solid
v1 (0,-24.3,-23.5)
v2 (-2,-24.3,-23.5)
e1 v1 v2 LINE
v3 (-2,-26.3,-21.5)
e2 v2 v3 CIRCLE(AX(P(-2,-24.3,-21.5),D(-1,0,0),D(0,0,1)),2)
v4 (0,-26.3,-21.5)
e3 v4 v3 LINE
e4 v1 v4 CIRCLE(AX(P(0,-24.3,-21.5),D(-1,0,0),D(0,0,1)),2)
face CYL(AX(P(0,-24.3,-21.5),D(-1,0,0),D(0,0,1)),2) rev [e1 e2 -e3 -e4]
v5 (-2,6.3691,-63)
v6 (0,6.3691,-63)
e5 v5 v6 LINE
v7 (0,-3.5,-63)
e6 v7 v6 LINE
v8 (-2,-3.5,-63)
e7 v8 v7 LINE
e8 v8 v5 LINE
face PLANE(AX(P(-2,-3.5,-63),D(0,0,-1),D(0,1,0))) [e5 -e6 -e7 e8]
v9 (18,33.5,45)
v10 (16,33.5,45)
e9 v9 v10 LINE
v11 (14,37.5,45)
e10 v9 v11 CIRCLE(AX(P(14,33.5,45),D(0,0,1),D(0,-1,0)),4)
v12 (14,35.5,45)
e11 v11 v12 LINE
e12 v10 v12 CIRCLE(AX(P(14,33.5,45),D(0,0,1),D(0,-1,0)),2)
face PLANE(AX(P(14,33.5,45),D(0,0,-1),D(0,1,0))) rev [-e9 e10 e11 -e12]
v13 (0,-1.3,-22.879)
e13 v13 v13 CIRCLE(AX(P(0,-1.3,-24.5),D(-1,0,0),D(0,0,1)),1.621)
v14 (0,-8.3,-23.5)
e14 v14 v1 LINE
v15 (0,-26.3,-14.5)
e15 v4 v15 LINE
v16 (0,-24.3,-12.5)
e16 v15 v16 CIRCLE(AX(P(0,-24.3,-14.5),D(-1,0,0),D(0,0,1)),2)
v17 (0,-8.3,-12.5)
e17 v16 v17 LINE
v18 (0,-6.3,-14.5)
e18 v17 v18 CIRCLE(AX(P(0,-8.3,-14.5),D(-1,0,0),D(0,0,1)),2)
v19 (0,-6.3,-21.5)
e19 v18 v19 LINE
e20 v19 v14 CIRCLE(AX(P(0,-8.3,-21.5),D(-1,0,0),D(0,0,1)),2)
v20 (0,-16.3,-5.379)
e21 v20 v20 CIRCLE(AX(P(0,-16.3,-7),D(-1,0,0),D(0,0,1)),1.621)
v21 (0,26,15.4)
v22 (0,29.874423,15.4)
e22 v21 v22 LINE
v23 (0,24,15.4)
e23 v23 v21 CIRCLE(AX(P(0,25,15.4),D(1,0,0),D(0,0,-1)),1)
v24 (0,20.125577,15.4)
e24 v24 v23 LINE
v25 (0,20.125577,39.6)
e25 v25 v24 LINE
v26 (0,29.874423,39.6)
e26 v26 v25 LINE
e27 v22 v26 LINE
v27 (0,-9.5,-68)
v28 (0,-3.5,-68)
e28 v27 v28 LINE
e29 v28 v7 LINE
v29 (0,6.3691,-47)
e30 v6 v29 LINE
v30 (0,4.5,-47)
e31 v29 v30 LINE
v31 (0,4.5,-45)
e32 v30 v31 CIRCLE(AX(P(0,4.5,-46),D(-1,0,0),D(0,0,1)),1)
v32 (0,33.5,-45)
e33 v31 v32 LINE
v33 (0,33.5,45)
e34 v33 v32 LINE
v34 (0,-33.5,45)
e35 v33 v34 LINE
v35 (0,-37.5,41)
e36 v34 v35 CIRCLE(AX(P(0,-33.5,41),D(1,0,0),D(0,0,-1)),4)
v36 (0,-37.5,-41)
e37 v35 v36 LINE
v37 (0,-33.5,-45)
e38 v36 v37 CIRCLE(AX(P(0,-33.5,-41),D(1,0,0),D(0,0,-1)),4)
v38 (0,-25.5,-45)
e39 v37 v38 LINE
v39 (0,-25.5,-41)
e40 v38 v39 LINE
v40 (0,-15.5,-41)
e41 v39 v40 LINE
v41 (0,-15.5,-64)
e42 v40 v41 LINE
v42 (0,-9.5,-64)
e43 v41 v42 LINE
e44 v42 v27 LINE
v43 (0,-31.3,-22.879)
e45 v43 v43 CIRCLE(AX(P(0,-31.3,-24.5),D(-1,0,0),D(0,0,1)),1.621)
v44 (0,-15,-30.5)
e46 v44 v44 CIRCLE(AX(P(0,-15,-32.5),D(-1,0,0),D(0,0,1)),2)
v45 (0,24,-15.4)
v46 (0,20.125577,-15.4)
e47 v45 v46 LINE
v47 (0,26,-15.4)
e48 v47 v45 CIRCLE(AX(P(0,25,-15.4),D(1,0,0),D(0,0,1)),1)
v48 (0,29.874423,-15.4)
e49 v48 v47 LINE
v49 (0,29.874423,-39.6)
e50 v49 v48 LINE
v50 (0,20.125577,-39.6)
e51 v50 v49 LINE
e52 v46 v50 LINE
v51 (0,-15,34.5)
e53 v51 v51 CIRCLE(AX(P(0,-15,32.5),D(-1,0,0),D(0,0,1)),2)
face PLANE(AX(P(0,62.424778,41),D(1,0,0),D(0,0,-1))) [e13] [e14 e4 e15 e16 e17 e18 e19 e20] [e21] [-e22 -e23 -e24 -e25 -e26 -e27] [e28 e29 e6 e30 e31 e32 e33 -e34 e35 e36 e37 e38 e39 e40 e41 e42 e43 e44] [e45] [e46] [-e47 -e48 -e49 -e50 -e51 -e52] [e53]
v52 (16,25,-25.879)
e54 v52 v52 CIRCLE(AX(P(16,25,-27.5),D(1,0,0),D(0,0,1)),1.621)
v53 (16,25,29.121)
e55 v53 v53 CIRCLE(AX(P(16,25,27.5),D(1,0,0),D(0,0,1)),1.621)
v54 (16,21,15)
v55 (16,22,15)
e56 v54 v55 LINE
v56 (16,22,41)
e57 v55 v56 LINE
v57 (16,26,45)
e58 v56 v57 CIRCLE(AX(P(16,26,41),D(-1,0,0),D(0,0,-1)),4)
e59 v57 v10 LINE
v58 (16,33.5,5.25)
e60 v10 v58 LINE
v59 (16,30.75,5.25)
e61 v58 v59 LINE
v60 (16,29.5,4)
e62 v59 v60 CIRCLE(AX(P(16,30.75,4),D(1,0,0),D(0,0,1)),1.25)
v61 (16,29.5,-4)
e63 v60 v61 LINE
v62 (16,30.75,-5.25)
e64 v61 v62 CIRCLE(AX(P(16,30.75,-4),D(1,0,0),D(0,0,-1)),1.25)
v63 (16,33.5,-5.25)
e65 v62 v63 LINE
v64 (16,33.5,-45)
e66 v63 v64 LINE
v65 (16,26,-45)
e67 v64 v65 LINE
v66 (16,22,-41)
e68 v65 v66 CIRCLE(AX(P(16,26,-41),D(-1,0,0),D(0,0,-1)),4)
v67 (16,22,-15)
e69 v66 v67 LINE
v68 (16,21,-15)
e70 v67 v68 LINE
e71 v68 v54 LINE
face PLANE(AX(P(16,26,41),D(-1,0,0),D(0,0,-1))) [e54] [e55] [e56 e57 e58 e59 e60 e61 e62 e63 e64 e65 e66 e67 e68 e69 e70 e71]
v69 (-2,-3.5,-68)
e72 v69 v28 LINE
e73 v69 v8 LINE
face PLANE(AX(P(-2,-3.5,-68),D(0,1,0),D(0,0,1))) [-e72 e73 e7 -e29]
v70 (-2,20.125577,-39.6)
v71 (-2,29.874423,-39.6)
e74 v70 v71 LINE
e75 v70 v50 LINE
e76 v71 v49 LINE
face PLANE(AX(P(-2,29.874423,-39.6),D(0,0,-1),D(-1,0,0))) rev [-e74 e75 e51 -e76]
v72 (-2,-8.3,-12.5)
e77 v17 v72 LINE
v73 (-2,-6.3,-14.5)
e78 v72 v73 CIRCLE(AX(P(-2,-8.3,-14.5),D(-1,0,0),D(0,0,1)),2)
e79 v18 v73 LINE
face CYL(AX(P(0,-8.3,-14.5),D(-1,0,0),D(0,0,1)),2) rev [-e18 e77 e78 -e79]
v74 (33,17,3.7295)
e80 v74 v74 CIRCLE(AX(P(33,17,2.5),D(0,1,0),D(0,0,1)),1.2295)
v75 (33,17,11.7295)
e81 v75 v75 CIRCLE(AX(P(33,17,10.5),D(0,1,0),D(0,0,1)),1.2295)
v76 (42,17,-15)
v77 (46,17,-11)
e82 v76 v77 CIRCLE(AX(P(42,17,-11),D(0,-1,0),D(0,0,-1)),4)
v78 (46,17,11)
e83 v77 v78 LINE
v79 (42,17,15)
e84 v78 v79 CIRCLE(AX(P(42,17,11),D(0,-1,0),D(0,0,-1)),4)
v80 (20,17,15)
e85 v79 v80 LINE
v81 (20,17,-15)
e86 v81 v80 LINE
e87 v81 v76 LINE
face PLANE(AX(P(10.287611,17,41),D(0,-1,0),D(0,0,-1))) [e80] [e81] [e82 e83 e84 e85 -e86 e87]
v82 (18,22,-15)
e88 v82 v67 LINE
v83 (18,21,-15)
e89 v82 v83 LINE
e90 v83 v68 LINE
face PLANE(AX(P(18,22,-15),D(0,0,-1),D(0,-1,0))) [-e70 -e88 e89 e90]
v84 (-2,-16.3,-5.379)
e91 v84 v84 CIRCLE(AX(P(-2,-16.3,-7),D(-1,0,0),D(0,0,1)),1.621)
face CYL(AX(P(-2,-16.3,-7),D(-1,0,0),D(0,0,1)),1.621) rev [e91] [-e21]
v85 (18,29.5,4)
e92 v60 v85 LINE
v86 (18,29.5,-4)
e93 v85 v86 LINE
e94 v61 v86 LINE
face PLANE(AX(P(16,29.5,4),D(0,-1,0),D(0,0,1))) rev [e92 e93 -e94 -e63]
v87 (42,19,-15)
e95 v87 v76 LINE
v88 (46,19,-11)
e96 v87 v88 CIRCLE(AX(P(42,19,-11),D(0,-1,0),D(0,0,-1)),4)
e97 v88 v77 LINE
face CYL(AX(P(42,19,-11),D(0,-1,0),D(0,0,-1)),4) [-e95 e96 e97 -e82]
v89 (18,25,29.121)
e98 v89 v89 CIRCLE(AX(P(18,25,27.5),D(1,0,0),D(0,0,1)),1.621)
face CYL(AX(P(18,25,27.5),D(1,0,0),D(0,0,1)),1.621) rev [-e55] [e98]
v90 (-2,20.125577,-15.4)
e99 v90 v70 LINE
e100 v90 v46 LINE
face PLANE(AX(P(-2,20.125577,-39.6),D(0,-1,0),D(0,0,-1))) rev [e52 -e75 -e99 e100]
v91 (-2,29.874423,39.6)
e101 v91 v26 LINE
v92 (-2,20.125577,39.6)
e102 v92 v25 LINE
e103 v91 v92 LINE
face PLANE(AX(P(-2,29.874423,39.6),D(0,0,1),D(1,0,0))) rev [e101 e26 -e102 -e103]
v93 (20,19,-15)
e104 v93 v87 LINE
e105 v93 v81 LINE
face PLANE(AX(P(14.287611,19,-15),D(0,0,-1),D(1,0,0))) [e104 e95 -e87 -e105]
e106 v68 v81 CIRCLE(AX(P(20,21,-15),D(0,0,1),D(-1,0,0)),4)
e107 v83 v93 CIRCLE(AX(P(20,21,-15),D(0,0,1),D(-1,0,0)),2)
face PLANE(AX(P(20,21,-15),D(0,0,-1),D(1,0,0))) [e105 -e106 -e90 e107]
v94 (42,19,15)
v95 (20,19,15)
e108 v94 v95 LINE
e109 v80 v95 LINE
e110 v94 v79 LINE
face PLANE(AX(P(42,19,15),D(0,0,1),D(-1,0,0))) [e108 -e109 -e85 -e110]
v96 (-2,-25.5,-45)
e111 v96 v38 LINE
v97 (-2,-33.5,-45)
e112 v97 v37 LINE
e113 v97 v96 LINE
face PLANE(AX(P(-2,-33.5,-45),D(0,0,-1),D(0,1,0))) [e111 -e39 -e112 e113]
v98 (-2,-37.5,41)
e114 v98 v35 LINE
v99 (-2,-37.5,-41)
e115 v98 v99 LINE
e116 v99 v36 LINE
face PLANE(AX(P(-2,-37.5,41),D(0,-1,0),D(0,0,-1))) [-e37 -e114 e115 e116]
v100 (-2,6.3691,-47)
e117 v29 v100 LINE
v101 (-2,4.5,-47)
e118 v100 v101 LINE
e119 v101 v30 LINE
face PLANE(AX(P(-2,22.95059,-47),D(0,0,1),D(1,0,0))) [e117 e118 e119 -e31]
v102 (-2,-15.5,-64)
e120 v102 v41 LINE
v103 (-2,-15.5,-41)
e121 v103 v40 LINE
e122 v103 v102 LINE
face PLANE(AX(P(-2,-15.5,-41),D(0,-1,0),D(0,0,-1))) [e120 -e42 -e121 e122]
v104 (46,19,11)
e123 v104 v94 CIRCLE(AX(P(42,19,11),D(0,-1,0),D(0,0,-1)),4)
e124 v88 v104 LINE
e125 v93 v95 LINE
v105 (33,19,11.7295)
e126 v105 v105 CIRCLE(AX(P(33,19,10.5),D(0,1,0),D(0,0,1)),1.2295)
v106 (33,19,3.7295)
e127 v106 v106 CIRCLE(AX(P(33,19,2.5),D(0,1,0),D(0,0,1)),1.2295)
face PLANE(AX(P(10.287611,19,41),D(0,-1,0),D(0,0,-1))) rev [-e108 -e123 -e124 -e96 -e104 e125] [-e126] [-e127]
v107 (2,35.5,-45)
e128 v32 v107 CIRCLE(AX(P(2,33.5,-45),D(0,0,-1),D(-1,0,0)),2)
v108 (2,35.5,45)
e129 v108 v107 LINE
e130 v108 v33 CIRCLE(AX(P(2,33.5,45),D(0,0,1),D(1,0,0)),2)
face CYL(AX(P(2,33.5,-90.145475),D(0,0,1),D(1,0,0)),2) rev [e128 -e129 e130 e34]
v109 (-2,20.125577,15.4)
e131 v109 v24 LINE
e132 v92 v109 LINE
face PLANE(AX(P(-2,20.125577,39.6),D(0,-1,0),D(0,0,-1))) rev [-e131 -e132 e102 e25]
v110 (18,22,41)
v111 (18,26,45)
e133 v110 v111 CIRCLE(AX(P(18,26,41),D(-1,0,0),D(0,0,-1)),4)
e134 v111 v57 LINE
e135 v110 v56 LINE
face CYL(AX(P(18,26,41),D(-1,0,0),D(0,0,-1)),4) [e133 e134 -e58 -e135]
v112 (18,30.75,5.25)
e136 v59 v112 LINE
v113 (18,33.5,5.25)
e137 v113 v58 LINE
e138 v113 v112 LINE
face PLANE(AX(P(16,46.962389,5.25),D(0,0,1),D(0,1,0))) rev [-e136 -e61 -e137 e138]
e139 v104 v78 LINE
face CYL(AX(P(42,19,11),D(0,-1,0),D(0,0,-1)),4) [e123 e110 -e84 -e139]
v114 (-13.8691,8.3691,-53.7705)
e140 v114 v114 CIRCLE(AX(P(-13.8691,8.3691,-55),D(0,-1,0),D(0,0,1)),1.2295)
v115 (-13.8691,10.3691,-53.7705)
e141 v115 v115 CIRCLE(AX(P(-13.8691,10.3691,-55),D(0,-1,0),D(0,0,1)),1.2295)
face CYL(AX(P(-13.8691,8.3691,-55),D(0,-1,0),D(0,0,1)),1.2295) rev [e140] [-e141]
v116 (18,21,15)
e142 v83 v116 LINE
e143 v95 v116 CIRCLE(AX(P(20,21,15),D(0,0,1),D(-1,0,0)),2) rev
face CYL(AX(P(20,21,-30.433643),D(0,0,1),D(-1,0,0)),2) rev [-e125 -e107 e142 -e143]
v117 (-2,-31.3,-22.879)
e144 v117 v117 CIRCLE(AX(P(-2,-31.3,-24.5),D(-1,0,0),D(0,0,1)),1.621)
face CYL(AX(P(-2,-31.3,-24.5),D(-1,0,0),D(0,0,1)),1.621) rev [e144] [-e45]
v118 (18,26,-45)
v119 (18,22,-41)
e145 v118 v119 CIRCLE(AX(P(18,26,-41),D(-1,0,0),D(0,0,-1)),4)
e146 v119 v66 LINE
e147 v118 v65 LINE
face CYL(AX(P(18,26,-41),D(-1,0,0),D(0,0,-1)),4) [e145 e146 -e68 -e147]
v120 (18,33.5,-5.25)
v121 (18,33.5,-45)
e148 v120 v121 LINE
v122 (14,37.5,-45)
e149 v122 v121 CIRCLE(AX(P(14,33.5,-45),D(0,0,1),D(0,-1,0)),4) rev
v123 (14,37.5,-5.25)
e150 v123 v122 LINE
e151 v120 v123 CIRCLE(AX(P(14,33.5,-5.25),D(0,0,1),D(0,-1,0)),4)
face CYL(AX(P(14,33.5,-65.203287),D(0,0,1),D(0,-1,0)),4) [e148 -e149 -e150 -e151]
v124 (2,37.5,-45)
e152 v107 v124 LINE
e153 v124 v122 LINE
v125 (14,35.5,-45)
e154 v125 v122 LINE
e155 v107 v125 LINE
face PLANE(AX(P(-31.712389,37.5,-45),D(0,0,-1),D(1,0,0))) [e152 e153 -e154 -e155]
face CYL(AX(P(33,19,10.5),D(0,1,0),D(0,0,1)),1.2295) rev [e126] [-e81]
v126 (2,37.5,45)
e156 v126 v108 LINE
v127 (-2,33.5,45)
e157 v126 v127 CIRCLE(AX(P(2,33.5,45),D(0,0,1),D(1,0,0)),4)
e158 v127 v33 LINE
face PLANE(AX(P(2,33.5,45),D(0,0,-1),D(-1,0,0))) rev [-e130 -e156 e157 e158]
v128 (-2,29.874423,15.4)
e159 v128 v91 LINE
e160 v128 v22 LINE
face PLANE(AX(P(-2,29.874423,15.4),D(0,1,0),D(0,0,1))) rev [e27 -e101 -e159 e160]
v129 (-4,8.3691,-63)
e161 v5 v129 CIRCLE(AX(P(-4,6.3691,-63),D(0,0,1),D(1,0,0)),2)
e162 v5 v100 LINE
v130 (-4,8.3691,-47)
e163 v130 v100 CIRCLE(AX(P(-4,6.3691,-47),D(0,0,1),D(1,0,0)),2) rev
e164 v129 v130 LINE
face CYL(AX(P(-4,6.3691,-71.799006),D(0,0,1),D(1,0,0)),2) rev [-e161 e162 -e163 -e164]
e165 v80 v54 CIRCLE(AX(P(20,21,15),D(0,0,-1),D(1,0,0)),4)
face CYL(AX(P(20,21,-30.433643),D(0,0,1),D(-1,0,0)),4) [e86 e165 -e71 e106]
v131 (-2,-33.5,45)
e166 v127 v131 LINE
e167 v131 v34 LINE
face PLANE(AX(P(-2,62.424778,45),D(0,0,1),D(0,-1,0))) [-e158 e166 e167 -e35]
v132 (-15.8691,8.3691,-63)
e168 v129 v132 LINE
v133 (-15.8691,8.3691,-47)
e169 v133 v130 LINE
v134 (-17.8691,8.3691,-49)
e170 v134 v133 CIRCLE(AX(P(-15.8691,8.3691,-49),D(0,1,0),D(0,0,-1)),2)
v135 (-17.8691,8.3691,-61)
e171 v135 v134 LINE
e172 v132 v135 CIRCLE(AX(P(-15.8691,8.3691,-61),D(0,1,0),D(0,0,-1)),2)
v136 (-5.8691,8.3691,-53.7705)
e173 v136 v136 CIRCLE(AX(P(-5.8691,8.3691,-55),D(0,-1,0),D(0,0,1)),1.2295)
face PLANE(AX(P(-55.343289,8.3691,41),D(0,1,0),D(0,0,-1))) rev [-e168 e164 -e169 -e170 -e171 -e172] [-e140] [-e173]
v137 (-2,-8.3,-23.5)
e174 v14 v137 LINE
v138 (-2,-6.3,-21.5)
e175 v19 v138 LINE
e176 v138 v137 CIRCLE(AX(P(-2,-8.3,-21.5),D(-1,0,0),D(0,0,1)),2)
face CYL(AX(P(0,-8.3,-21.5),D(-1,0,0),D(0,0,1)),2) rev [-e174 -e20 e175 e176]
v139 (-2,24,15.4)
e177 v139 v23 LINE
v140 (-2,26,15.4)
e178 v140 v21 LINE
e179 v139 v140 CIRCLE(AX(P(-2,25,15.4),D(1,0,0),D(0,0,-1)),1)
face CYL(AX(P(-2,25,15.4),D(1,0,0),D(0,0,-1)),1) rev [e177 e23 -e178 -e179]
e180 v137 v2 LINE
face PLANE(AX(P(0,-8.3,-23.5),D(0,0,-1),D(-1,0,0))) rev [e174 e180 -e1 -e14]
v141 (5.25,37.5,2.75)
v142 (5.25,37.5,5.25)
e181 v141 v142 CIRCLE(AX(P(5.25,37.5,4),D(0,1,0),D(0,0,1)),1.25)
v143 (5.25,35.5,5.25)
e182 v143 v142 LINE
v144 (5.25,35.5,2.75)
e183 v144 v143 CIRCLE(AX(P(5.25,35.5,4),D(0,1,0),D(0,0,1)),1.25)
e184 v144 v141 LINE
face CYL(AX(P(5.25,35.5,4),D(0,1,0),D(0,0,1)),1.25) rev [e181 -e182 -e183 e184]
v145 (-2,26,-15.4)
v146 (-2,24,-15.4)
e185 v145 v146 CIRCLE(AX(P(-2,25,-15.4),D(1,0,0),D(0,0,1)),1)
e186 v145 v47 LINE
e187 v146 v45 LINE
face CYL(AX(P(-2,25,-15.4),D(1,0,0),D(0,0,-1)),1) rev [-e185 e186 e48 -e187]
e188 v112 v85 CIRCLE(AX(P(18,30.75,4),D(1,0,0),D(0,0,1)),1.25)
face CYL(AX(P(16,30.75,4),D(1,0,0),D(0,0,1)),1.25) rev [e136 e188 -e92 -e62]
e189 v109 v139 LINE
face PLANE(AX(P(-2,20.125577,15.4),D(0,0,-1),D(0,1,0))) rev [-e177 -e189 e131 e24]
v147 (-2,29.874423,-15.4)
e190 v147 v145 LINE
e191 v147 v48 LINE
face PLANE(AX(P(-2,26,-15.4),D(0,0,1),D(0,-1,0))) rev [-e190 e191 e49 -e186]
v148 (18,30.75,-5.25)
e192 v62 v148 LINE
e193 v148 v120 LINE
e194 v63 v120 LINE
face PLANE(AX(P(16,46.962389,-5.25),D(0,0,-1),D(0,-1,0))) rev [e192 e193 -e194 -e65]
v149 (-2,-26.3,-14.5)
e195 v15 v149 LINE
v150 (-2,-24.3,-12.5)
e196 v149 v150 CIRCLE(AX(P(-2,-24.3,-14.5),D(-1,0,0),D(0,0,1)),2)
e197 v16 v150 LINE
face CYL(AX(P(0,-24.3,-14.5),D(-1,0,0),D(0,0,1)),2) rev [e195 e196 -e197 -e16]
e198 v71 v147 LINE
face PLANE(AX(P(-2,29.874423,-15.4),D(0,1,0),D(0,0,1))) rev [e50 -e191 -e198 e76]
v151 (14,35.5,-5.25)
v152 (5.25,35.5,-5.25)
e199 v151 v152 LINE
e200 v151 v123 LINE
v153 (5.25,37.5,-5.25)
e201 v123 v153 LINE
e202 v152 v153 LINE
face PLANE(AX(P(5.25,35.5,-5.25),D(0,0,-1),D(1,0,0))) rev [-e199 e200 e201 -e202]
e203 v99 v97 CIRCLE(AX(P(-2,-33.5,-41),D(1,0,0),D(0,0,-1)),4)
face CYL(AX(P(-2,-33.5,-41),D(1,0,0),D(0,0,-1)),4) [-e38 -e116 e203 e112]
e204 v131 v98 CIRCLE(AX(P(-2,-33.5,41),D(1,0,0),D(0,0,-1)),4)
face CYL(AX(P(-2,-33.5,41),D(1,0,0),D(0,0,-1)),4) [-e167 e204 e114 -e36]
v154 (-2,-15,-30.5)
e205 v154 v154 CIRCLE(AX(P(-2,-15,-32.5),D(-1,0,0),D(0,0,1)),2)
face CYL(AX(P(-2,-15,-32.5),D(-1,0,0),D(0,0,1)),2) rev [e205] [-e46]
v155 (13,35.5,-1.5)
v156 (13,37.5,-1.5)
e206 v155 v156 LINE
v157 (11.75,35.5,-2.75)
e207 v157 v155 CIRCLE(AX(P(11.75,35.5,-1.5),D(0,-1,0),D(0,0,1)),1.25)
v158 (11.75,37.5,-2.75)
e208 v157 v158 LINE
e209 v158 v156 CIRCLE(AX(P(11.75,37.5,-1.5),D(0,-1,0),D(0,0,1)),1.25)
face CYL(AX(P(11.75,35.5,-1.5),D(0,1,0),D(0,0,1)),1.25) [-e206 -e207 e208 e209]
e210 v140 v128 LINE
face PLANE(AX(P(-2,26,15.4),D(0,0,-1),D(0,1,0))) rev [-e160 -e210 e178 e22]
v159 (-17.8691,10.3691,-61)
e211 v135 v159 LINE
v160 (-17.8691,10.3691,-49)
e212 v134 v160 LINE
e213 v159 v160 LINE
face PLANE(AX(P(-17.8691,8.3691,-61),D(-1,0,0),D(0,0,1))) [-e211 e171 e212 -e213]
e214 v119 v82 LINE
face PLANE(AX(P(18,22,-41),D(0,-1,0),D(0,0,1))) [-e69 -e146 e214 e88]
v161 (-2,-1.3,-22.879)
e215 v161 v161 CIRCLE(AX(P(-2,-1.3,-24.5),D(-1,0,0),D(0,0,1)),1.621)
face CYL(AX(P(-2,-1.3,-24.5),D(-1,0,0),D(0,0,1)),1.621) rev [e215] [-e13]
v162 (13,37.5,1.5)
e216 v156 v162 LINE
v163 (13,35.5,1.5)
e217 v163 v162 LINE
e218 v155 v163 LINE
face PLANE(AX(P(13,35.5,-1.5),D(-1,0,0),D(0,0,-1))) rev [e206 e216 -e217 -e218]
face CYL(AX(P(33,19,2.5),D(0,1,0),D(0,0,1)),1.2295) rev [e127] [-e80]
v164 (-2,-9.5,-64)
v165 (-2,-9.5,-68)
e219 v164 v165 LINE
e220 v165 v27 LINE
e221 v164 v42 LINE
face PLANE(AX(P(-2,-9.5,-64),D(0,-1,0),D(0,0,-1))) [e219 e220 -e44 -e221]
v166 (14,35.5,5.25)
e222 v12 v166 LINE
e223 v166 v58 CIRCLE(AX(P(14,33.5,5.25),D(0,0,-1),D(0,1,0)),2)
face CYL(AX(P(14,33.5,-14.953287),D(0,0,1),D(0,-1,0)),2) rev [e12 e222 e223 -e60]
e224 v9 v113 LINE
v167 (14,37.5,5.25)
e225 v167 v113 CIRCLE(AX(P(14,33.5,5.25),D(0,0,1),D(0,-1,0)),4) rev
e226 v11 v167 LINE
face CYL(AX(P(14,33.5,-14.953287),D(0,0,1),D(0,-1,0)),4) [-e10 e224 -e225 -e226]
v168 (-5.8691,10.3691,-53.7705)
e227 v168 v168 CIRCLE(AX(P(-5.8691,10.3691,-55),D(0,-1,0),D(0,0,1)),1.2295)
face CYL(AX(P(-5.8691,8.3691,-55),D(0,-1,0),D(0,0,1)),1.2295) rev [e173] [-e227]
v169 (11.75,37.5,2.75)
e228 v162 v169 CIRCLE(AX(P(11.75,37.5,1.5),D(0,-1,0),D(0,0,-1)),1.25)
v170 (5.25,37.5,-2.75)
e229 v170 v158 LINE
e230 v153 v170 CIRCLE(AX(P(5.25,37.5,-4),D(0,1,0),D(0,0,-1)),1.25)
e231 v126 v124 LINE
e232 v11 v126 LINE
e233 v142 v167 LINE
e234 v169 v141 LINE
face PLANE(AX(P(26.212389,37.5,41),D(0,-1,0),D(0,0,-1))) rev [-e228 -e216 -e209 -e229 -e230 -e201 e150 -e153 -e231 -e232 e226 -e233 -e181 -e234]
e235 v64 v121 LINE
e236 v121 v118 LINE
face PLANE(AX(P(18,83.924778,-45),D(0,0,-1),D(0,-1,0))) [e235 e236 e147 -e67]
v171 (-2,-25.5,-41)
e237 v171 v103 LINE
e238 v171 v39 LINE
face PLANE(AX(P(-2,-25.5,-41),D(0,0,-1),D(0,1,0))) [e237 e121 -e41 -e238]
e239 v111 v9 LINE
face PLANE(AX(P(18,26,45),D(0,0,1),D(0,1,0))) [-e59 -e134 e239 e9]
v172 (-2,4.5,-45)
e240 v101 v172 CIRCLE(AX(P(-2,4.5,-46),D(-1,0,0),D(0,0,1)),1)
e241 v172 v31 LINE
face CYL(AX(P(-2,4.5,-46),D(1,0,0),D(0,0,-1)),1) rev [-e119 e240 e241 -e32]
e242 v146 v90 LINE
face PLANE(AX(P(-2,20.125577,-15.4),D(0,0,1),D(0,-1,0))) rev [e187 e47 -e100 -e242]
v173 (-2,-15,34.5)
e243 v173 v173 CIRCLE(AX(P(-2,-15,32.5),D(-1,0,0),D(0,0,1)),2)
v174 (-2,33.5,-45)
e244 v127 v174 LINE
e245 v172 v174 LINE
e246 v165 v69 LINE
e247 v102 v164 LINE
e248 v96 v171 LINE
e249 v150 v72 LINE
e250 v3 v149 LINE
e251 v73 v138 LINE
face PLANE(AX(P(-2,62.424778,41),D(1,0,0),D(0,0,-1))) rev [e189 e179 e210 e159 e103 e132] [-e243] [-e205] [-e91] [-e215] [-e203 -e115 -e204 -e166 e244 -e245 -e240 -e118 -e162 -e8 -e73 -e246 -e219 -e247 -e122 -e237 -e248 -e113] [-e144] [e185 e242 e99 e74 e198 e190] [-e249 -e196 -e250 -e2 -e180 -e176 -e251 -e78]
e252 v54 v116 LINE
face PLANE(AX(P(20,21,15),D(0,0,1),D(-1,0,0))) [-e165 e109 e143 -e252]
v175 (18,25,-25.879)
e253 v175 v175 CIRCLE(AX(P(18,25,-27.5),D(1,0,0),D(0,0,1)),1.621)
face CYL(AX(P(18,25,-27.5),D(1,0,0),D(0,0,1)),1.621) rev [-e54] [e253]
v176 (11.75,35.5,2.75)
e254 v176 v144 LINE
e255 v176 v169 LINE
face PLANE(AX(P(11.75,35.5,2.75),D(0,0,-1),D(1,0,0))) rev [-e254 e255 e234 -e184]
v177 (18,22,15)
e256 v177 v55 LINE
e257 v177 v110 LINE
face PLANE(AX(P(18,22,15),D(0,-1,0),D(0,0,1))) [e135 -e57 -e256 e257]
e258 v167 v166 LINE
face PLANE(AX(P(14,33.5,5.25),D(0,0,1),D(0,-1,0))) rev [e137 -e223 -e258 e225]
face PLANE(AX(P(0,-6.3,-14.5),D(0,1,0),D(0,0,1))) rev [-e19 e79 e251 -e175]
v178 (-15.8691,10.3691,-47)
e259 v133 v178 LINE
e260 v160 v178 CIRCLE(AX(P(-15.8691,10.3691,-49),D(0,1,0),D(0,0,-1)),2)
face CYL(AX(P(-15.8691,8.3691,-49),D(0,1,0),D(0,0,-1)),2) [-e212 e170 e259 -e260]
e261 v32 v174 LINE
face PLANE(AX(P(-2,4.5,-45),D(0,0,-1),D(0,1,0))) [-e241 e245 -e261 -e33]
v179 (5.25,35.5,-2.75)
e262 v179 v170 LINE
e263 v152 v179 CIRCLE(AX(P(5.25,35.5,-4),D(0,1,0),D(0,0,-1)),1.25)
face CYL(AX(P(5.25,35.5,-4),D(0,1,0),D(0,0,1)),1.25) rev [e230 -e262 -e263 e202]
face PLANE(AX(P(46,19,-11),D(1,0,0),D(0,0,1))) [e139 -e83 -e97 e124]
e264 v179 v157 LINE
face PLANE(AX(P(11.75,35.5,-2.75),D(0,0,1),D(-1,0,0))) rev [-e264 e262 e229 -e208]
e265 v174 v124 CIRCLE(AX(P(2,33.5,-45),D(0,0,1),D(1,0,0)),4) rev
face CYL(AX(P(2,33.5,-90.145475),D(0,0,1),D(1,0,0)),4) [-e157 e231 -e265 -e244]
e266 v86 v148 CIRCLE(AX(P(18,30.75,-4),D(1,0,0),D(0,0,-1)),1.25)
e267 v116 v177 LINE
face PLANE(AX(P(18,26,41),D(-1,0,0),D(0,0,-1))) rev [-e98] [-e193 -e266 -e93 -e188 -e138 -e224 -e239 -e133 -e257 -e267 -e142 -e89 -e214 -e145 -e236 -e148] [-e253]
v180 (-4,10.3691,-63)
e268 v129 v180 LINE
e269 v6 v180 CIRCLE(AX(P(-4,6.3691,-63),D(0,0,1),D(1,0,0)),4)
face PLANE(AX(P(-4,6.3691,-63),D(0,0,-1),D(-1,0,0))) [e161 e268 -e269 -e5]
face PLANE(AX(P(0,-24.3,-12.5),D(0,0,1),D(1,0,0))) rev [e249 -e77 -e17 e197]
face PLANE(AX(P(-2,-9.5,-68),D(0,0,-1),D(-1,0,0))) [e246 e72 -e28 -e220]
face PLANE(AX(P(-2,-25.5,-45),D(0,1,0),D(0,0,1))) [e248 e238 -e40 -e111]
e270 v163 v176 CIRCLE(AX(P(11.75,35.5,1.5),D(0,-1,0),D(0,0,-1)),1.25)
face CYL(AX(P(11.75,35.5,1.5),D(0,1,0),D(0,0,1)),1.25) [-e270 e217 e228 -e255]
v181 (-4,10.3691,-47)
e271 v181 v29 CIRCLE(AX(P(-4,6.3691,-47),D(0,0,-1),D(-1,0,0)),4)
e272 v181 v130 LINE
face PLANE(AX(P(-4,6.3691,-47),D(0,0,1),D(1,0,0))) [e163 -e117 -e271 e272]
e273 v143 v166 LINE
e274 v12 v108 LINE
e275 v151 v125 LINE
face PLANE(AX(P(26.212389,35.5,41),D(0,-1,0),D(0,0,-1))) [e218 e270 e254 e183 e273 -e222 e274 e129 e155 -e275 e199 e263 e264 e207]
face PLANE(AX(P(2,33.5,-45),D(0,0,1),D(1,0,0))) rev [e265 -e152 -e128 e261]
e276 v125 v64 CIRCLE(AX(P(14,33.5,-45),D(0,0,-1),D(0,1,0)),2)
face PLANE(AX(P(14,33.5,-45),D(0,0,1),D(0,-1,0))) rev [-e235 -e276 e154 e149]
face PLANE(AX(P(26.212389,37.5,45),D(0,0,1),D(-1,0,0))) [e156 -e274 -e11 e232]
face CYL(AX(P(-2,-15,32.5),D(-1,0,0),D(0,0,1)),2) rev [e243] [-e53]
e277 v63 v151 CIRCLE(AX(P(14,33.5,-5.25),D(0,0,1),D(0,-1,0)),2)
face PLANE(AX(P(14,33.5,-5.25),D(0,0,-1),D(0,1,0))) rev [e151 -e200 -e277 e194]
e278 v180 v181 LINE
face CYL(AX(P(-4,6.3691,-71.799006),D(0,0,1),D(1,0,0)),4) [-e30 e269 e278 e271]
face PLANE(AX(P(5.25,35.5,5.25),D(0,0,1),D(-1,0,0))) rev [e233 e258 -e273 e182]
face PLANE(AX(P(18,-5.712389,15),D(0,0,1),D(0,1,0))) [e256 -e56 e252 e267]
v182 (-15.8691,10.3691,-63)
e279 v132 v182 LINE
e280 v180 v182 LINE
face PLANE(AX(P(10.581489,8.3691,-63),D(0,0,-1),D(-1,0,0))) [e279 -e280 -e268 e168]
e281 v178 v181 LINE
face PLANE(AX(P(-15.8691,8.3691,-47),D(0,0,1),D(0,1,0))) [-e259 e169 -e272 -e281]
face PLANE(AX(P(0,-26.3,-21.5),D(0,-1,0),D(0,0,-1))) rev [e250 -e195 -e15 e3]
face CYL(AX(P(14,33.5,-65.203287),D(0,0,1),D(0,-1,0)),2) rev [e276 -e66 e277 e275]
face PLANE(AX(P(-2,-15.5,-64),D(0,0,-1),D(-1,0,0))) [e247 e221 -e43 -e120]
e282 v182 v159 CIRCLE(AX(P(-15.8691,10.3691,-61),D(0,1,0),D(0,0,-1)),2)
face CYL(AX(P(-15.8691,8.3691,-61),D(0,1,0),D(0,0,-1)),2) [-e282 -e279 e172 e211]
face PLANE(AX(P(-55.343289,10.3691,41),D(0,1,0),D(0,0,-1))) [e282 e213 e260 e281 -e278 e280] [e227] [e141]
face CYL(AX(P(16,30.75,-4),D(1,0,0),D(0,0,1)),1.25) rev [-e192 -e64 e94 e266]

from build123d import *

# Parameters (mm, degrees)
BOSS_EXTRUDE1_DEPTH        = 2
F_4_0_4_DIAMETER_HOLE1_D   = 4
M3_CLEARANCE_HOLE1_D       = 3.242
M2_CLEARANCE_HOLE1_D       = 2.459
CUT_EXTRUDE1_DEPTH         = 120.410650844
CUT_EXTRUDE2_DEPTH         = 120.410650844
CUT_EXTRUDE3_DEPTH         = 120.410650844
SKETCHED_START             = 71.002297961
SKETCHED_BEND5_OUTLINE_W   = 2
SKETCHED_BEND5_OUTLINE_H   = 30
SKETCHED_BEND5_DEPTH       = 27.13486898
SKETCHED_START_2           = 69.424777961
SKETCHED_BEND5_2_OUTLINE_R = 1.2295
SKETCHED_BEND5_2_DEPTH     = 1.57752
SKETCHED_START_3           = 70.821415498
SKETCHED_BEND5_3_OUTLINE_W = 2
SKETCHED_BEND5_3_OUTLINE_H = 30
SKETCHED_BEND5_3_DEPTH     = 0.180882463
SKETCHED_START_4           = 67.424777961
SKETCHED_BEND5_4_OUTLINE_R = 1.2295
SKETCHED_BEND5_4_DEPTH     = 3.044520614
SKETCHED_BEND5_5_OUTLINE_R = 1.2295
SKETCHED_BEND5_5_DEPTH     = 0.42248
SKETCHED_START_5           = -15
SKETCHED_BEND5_6_DEPTH     = 30
SKETCHED_BEND5_7_DEPTH     = 30
SKETCHED_START_6           = 53.789908981
SKETCHED_BEND6_OUTLINE_R   = 1.2295
SKETCHED_BEND6_DEPTH       = 17.63486898
SKETCHED_START_7           = 50.212388981
SKETCHED_BEND6_2_OUTLINE_R = 1.621
SKETCHED_BEND6_2_DEPTH     = 5.796728131
SKETCHED_START_8           = 52.569466273
SKETCHED_BEND6_3_OUTLINE_W = 2
SKETCHED_BEND6_3_OUTLINE_H = 30
SKETCHED_BEND6_3_DEPTH     = 29.642922707
SKETCHED_BEND6_4_DEPTH     = 30
SKETCHED_START_9           = -45
SKETCHED_BEND6_5_DEPTH     = 90
SKETCHED_START_10          = 13
SKETCHED_BEND6_6_OUTLINE_W = 2
SKETCHED_BEND6_6_OUTLINE_H = 30
SKETCHED_BEND6_6_OUTLINE_R = 1.2295
SKETCHED_BEND6_6_DEPTH     = 5.5
SKETCHED_START_11          = 17.9863
SKETCHED_BEND6_7_OUTLINE_W = 1.642922708
SKETCHED_BEND6_7_OUTLINE_H = 30
SKETCHED_BEND6_7_DEPTH     = 0.5137
SKETCHED_BEND7_DEPTH       = 90
SKETCHED_BEND7_2_OUTLINE_W = 2
SKETCHED_BEND7_2_OUTLINE_H = 7.500000007
SKETCHED_BEND7_2_DEPTH     = 90
SKETCHED_BEND7_3_DEPTH     = 30
SKETCHED_BEND7_4_DEPTH     = 41
SKETCHED_START_12          = 4
SKETCHED_BEND7_5_DEPTH     = 41
SKETCHED_START_13          = 30.750000007
SKETCHED_BEND7_6_DEPTH     = 7.249999993
SKETCHED_START_14          = 4.5
SKETCHED_BEND7_7_OUTLINE_R = 1.2295
SKETCHED_BEND7_7_DEPTH     = 17.5
SKETCHED_START_15          = 16
SKETCHED_BEND7_8_OUTLINE_R = 1.621
SKETCHED_BEND7_8_DEPTH     = 3
SKETCHED_START_16          = 9.797769412
SKETCHED_BEND8_OUTLINE_W   = 2
SKETCHED_BEND8_OUTLINE_H   = 16.000000001
SKETCHED_BEND8_DEPTH       = 15.152820181
SKETCHED_START_17          = 8.369100306
SKETCHED_BEND8_2_OUTLINE_R = 1.2295
SKETCHED_BEND8_2_DEPTH     = 1.428669106
SKETCHED_START_18          = 6.746620306
SKETCHED_BEND8_3_OUTLINE_R = 1.2295
SKETCHED_BEND8_3_DEPTH     = 3.62248
SKETCHED_START_19          = -62.999999998
SKETCHED_BEND8_4_DEPTH     = 16
SKETCHED_BEND8_5_DEPTH     = 16


with BuildPart() as part:
    # Sketch17 → Boss-Extrude1 (new body)
    with BuildSketch(Plane(origin=(0, 0, 0), x_dir=(0, 0, -1), z_dir=(1, 0, 0))):
        with BuildLine():
            Line((-45, 62.424777961), (-45, -33.5))
            ThreePointArc((-45, -33.5), (-43.828427125, -36.328427125), (-41, -37.5))
            Line((-41, -37.5), (41, -37.5))
            ThreePointArc((41, -37.5), (43.828427125, -36.328427125), (45, -33.5))
            Line((45, -33.5), (45, -25.5))
            Line((45, -25.5), (41.000000004, -25.5))
            Line((41.000000004, -25.5), (41.000000004, -15.5))
            Line((41.000000004, -15.5), (63.999999999, -15.5))
            Line((63.999999999, -15.5), (63.999999999, -9.5))
            Line((63.999999999, -9.5), (67.999999998, -9.5))
            Line((67.999999998, -9.5), (67.999999998, -3.5))
            Line((67.999999998, -3.5), (62.999999998, -3.5))
            Line((62.999999998, -3.5), (62.999999998, 22.950589592))
            ThreePointArc((62.999999998, 22.950589592), (62.41421356, 24.364803155), (60.999999998, 24.950589593))
            Line((60.999999998, 24.950589593), (48.999999998, 24.950589593))
            ThreePointArc((48.999999998, 24.950589593), (47.585786435, 24.364803155), (46.999999998, 22.950589592))
            Line((46.999999998, 22.950589592), (46.999999998, 4.5))
            ThreePointArc((46.999999998, 4.5), (45.999999999, 3.500000002), (45, 4.5))
            Line((45, 4.5), (45, 62.424777961))
            ThreePointArc((45, 62.424777961), (43.828427125, 65.253205086), (41, 66.424777961))
            Line((41, 66.424777961), (15, 66.424777961))
            Line((15, 66.424777961), (15, 94.137166941))
            ThreePointArc((15, 94.137166941), (13.828427125, 96.965594066), (11, 98.137166941))
            Line((11, 98.137166941), (-11, 98.137166941))
            ThreePointArc((-11, 98.137166941), (-13.828427125, 96.965594066), (-15, 94.137166941))
            Line((-15, 94.137166941), (-15, 66.424777961))
            Line((-15, 66.424777961), (-41, 66.424777961))
            ThreePointArc((-41, 66.424777961), (-43.828427125, 65.253205086), (-45, 62.424777961))
        make_face()
    extrude(amount=-BOSS_EXTRUDE1_DEPTH)

    # Ø4.0 (4) Diameter Hole1 (through all)
    with Locations(Plane.ZY.offset(2)):
        with Locations((32.5, -15), (-32.5, -15)):
            Hole(F_4_0_4_DIAMETER_HOLE1_D / 2)

    # M3 Clearance Hole1 (through all)
    with Locations(Plane.ZY.offset(2)):
        with Locations((-7, -16.3), (-24.5, -31.3), (-24.5, -1.3), (-27.5, 63.424777961), (27.5, 63.424777961)):
            Hole(M3_CLEARANCE_HOLE1_D / 2)

    # M2 Clearance Hole1 (through all)
    with Locations(Plane.ZY.offset(2)):
        with Locations((-54.999999998, 20.950589593), (-54.999999998, 12.950589593), (2.5, 85.137166941), (10.5, 85.137166941)):
            Hole(M2_CLEARANCE_HOLE1_D / 2)

    # Sketch24 → Cut-Extrude1 (cut, through all)
    with BuildSketch(Plane.ZY.offset(2)):
        with BuildLine():
            Line((5.25, 41.462388992), (5.25, 57.674777954))
            ThreePointArc((5.25, 57.674777954), (4.883883476, 58.55866143), (4, 58.924777954))
            Line((4, 58.924777954), (-4, 58.924777954))
            ThreePointArc((-4, 58.924777954), (-4.883883476, 58.55866143), (-5.25, 57.674777954))
            Line((-5.25, 57.674777954), (-5.25, 41.462388992))
            ThreePointArc((-5.25, 41.462388992), (-4, 40.212388992), (-2.75, 41.462388992))
            Line((-2.75, 41.462388992), (-2.75, 47.962388992))
            ThreePointArc((-2.75, 47.962388992), (-2.383883476, 48.846272468), (-1.5, 49.212388992))
            Line((-1.5, 49.212388992), (1.5, 49.212388992))
            ThreePointArc((1.5, 49.212388992), (2.383883476, 48.846272468), (2.75, 47.962388992))
            Line((2.75, 47.962388992), (2.75, 41.462388992))
            ThreePointArc((2.75, 41.462388992), (4, 40.212388992), (5.25, 41.462388992))
        make_face()
    extrude(amount=-CUT_EXTRUDE1_DEPTH, mode=Mode.SUBTRACT)

    # Sketch25 → Cut-Extrude2 (cut, through all)
    with BuildSketch(Plane(origin=(0, 0, 0), x_dir=(0, 0, -1), z_dir=(1, 0, 0))):
        with BuildLine():
            Line((-15.4, 20.125576935), (-15.4, 23.999999992))
            ThreePointArc((-15.4, 23.999999992), (-14.4, 24.999999992), (-15.4, 25.999999992))
            Line((-15.4, 25.999999992), (-15.4, 29.87442305))
            Line((-15.4, 29.87442305), (-39.6, 29.87442305))
            Line((-39.6, 29.87442305), (-39.6, 20.125576935))
            Line((-39.6, 20.125576935), (-15.4, 20.125576935))
        make_face()
        with BuildLine():
            Line((39.6, 29.87442305), (39.6, 20.125576935))
            Line((39.6, 20.125576935), (15.4, 20.125576935))
            Line((15.4, 20.125576935), (15.4, 23.999999992))
            ThreePointArc((15.4, 23.999999992), (14.4, 24.999999992), (15.4, 25.999999992))
            Line((15.4, 25.999999992), (15.4, 29.87442305))
            Line((15.4, 29.87442305), (39.6, 29.87442305))
        make_face()
    extrude(amount=-CUT_EXTRUDE2_DEPTH, mode=Mode.SUBTRACT)

    # Sketch26 → Cut-Extrude3 (cut, through all)
    with BuildSketch(Plane.ZY.offset(2)):
        with BuildLine():
            Line((-21.500000002, -26.3), (-14.499999998, -26.3))
            ThreePointArc((-14.499999998, -26.3), (-13.085786437, -25.714213563), (-12.5, -24.300000002))
            Line((-12.5, -24.300000002), (-12.5, -8.299999998))
            ThreePointArc((-12.5, -8.299999998), (-13.085786437, -6.885786437), (-14.499999998, -6.3))
            Line((-14.499999998, -6.3), (-21.500000002, -6.3))
            ThreePointArc((-21.500000002, -6.3), (-22.914213563, -6.885786437), (-23.5, -8.299999998))
            Line((-23.5, -8.299999998), (-23.5, -24.300000002))
            ThreePointArc((-23.5, -24.300000002), (-22.914213563, -25.714213563), (-21.500000002, -26.3))
        make_face()
    extrude(amount=-CUT_EXTRUDE3_DEPTH, mode=Mode.SUBTRACT)

    # Sketched Bend5: read off the stored shape, not the designer's step
    # Sketched Bend5 outline → Sketched Bend5 (cut)
    with BuildSketch(Plane(origin=(0, 0, 0), x_dir=(1, 0, 0), z_dir=(0, 1, 0)).offset(SKETCHED_START)):
        with Locations((-1, 0)):
            Rectangle(SKETCHED_BEND5_OUTLINE_W, SKETCHED_BEND5_OUTLINE_H)
    extrude(amount=SKETCHED_BEND5_DEPTH, mode=Mode.SUBTRACT)

    # Sketched Bend5 2 outline → Sketched Bend5 2 (add)
    with BuildSketch(Plane(origin=(0, 0, 0), x_dir=(1, 0, 0), z_dir=(0, 1, 0)).offset(SKETCHED_START_2)):
        with BuildLine():
            ThreePointArc((-30, -11), (-28.828427125, -13.828427125), (-26, -15))
            Line((-26, -15), (-2, -15))
            Line((-2, -15), (-2, 15))
            Line((-2, 15), (-26, 15))
            ThreePointArc((-26, 15), (-28.828427125, 13.828427125), (-30, 11))
            Line((-30, 11), (-30, -11))
        make_face()
        with Locations((-17, -10.5)):
            Circle(SKETCHED_BEND5_2_OUTLINE_R, mode=Mode.SUBTRACT)
        with Locations((-17, -2.5)):
            Circle(SKETCHED_BEND5_2_OUTLINE_R, mode=Mode.SUBTRACT)
    extrude(amount=SKETCHED_BEND5_2_DEPTH)

    # Sketched Bend5 3 outline → Sketched Bend5 3 (cut)
    with BuildSketch(Plane(origin=(0, 0, 0), x_dir=(1, 0, 0), z_dir=(0, 1, 0)).offset(SKETCHED_START_3)):
        with Locations((-1, 0)):
            Rectangle(SKETCHED_BEND5_3_OUTLINE_W, SKETCHED_BEND5_3_OUTLINE_H)
    extrude(amount=SKETCHED_BEND5_3_DEPTH, mode=Mode.SUBTRACT)

    # Sketched Bend5 4 outline → Sketched Bend5 4 (add)
    with BuildSketch(Plane(origin=(0, 0, 0), x_dir=(1, 0, 0), z_dir=(0, 1, 0)).offset(SKETCHED_START_4)):
        with BuildLine():
            ThreePointArc((-30, -11), (-28.828427125, -13.828427125), (-26, -15))
            Line((-26, -15), (-2, -15))
            Line((-2, -15), (-2, 15))
            Line((-2, 15), (-26, 15))
            ThreePointArc((-26, 15), (-28.828427125, 13.828427125), (-30, 11))
            Line((-30, 11), (-30, -11))
        make_face()
        with Locations((-17, -10.5)):
            Circle(SKETCHED_BEND5_4_OUTLINE_R, mode=Mode.SUBTRACT)
        with Locations((-17, -2.5)):
            Circle(SKETCHED_BEND5_4_OUTLINE_R, mode=Mode.SUBTRACT)
    extrude(amount=SKETCHED_BEND5_4_DEPTH)

    # Sketched Bend5 5 outline → Sketched Bend5 5 (add)
    with BuildSketch(Plane(origin=(0, 0, 0), x_dir=(1, 0, 0), z_dir=(0, 1, 0)).offset(SKETCHED_START)):
        with BuildLine():
            ThreePointArc((-30, -11), (-28.828427125, -13.828427125), (-26, -15))
            Line((-26, -15), (-2, -15))
            Line((-2, -15), (-2, 15))
            Line((-2, 15), (-26, 15))
            ThreePointArc((-26, 15), (-28.828427125, 13.828427125), (-30, 11))
            Line((-30, 11), (-30, -11))
        make_face()
        with Locations((-17, -10.5)):
            Circle(SKETCHED_BEND5_5_OUTLINE_R, mode=Mode.SUBTRACT)
        with Locations((-17, -2.5)):
            Circle(SKETCHED_BEND5_5_OUTLINE_R, mode=Mode.SUBTRACT)
    extrude(amount=SKETCHED_BEND5_5_DEPTH)

    # Sketched Bend5 6 outline → Sketched Bend5 6 (cut)
    with BuildSketch(Plane.XY.offset(SKETCHED_START_5)):
        with BuildLine():
            ThreePointArc((-2, 67.424777961), (-2.585786438, 68.838991523), (-4, 69.424777961))
            Line((-4, 69.424777961), (-30, 69.424777961))
            Line((-30, 69.424777961), (-30, 67.424777961))
            Line((-30, 67.424777961), (-2, 67.424777961))
        make_face()
        with BuildLine():
            Line((0, 70.821415498), (-1.887453327, 70.821415498))
            ThreePointArc((-1.887453327, 70.821415498), (-0.503559904, 69.367689862), (0, 67.424777961))
            Line((0, 67.424777961), (0, 70.821415498))
        make_face()
        with BuildLine():
            Line((-2, 71.424777961), (-4, 71.424777961))
            ThreePointArc((-4, 71.424777961), (-2.96472382, 71.288481266), (-2, 70.888879577))
            Line((-2, 70.888879577), (-2, 71.424777961))
        make_face()
    extrude(amount=SKETCHED_BEND5_6_DEPTH, mode=Mode.SUBTRACT)

    # Sketched Bend5 7 outline → Sketched Bend5 7 (add)
    with BuildSketch(Plane.XY.offset(SKETCHED_START_5)):
        with BuildLine():
            ThreePointArc((-1.887453327, 70.821415498), (-1.943450004, 70.855609073), (-2, 70.888879577))
            Line((-2, 70.888879577), (-2, 70.821415498))
            Line((-2, 70.821415498), (-1.887453327, 70.821415498))
        make_face()
    extrude(amount=SKETCHED_BEND5_7_DEPTH)

    # Sketched Bend6: read off the stored shape, not the designer's step
    # Sketched Bend6 outline → Sketched Bend6 (cut)
    with BuildSketch(Plane(origin=(0, 0, 0), x_dir=(1, 0, 0), z_dir=(0, 1, 0)).offset(SKETCHED_START_6)):
        with BuildLine():
            Line((0, 45), (-2, 45))
            Line((-2, 45), (-2, 15))
            Line((-2, 15), (-26, 15))
            ThreePointArc((-26, 15), (-28.828427125, 13.828427125), (-30, 11))
            Line((-30, 11), (-30, -11))
            ThreePointArc((-30, -11), (-28.828427125, -13.828427125), (-26, -15))
            Line((-26, -15), (-2, -15))
            Line((-2, -15), (-2, -45))
            Line((-2, -45), (0, -45))
            Line((0, -45), (0, 45))
        make_face()
        with Locations((-17, -2.5)):
            Circle(SKETCHED_BEND6_OUTLINE_R, mode=Mode.SUBTRACT)
        with Locations((-17, -10.5)):
            Circle(SKETCHED_BEND6_OUTLINE_R, mode=Mode.SUBTRACT)
    extrude(amount=SKETCHED_BEND6_DEPTH, mode=Mode.SUBTRACT)

    # Sketched Bend6 2 outline → Sketched Bend6 2 (add)
    with BuildSketch(Plane(origin=(0, 0, 0), x_dir=(1, 0, 0), z_dir=(0, 1, 0)).offset(SKETCHED_START_7)):
        with BuildLine():
            ThreePointArc((13.5, 41), (12.328427125, 43.828427125), (9.5, 45))
            Line((9.5, 45), (0, 45))
            Line((0, 45), (0, 5.25))
            Line((0, 5.25), (4.749999993, 5.25))
            ThreePointArc((4.749999993, 5.25), (5.633883469, 4.883883476), (5.999999993, 4))
            Line((5.999999993, 4), (5.999999993, -4))
            ThreePointArc((5.999999993, -4), (5.633883469, -4.883883476), (4.749999993, -5.25))
            Line((4.749999993, -5.25), (0, -5.25))
            Line((0, -5.25), (0, -45))
            Line((0, -45), (9.5, -45))
            ThreePointArc((9.5, -45), (12.328427125, -43.828427125), (13.5, -41))
            Line((13.5, -41), (13.5, -15))
            Line((13.5, -15), (16.5, -15))
            Line((16.5, -15), (16.5, 15))
            Line((16.5, 15), (13.5, 15))
            Line((13.5, 15), (13.5, 41))
        make_face()
        with Locations((10.5, -27.5)):
            Circle(SKETCHED_BEND6_2_OUTLINE_R, mode=Mode.SUBTRACT)
        with Locations((10.5, 27.5)):
            Circle(SKETCHED_BEND6_2_OUTLINE_R, mode=Mode.SUBTRACT)
    extrude(amount=SKETCHED_BEND6_2_DEPTH)

    # Sketched Bend6 3 outline → Sketched Bend6 3 (add)
    with BuildSketch(Plane(origin=(0, 0, 0), x_dir=(1, 0, 0), z_dir=(0, 1, 0)).offset(SKETCHED_START_8)):
        with Locations((17.5, 0)):
            Rectangle(SKETCHED_BEND6_3_OUTLINE_W, SKETCHED_BEND6_3_OUTLINE_H)
    extrude(amount=SKETCHED_BEND6_3_DEPTH)

    # Sketched Bend6 4 outline → Sketched Bend6 4 (add)
    with BuildSketch(Plane.XY.offset(SKETCHED_START_5)):
        with BuildLine():
            ThreePointArc((16.5, 56.212388981), (16.497409152, 56.110621214), (16.489643322, 56.009117112))
            Line((16.489643322, 56.009117112), (16.5, 56.009117112))
            Line((16.5, 56.009117112), (16.5, 56.212388981))
        make_face()
    extrude(amount=SKETCHED_BEND6_4_DEPTH)

    # Sketched Bend6 5 outline → Sketched Bend6 5 (cut)
    with BuildSketch(Plane.XY.offset(SKETCHED_START_9)):
        with BuildLine():
            ThreePointArc((2, 52.212388981), (0.585786438, 51.626602543), (0, 50.212388981))
            Line((0, 50.212388981), (16.5, 50.212388981))
            Line((16.5, 50.212388981), (16.5, 52.569466273))
            Line((16.5, 52.569466273), (18.5, 52.569466273))
            Line((18.5, 52.569466273), (18.5, 56.212388981))
            ThreePointArc((18.5, 56.212388981), (17.328427125, 53.383961856), (14.5, 52.212388981))
            Line((14.5, 52.212388981), (2, 52.212388981))
        make_face()
        with BuildLine():
            Line((0, 56.009117112), (0, 53.789908981))
            Line((0, 53.789908981), (-2, 53.789908981))
            Line((-2, 53.789908981), (-2, 50.212388981))
            ThreePointArc((-2, 50.212388981), (-0.828427124, 53.040816105), (2, 54.212388981))
            Line((2, 54.212388981), (14.5, 54.212388981))
            ThreePointArc((14.5, 54.212388981), (15.840420879, 54.728046746), (16.489643322, 56.009117112))
            Line((16.489643322, 56.009117112), (0, 56.009117112))
        make_face()
    extrude(amount=SKETCHED_BEND6_5_DEPTH, mode=Mode.SUBTRACT)

    # Sketched Bend6 6 outline → Sketched Bend6 6 (cut)
    with BuildSketch(Plane.YZ.offset(SKETCHED_START_10)):
        with BuildLine():
            ThreePointArc((78.21238898, 15), (81.040816105, 13.828427125), (82.21238898, 11))
            Line((82.21238898, 11), (82.21238898, 15))
            Line((82.21238898, 15), (78.21238898, 15))
        make_face()
        with BuildLine():
            Line((82.21238898, -15), (82.21238898, -11))
            ThreePointArc((82.21238898, -11), (81.040816105, -13.828427125), (78.21238898, -15))
            Line((78.21238898, -15), (82.21238898, -15))
        make_face()
        with Locations((51.212388981, 0)):
            Rectangle(SKETCHED_BEND6_6_OUTLINE_W, SKETCHED_BEND6_6_OUTLINE_H)
        with Locations((69.21238898, 10.5)):
            Circle(SKETCHED_BEND6_6_OUTLINE_R)
        with Locations((69.21238898, 2.5)):
            Circle(SKETCHED_BEND6_6_OUTLINE_R)
    extrude(amount=SKETCHED_BEND6_6_DEPTH, mode=Mode.SUBTRACT)

    # Sketched Bend6 7 outline → Sketched Bend6 7 (cut)
    with BuildSketch(Plane.YZ.offset(SKETCHED_START_11)):
        with Locations((53.390927627, 0)):
            Rectangle(SKETCHED_BEND6_7_OUTLINE_W, SKETCHED_BEND6_7_OUTLINE_H)
    extrude(amount=SKETCHED_BEND6_7_DEPTH, mode=Mode.SUBTRACT)

    # Sketched Bend7: read off the stored shape, not the designer's step
    # Sketched Bend7 outline → Sketched Bend7 (cut)
    with BuildSketch(Plane.XY.offset(SKETCHED_START_9)):
        with BuildLine():
            ThreePointArc((-2, 33.5), (-1.464101615, 35.5), (0, 36.964101616))
            Line((0, 36.964101616), (0, 50.212388981))
            ThreePointArc((0, 50.212388981), (0.585786438, 51.626602543), (2, 52.212388981))
            Line((2, 52.212388981), (14.5, 52.212388981))
            ThreePointArc((14.5, 52.212388981), (17.328427125, 53.383961856), (18.5, 56.212388981))
            Line((18.5, 56.212388981), (18.5, 82.21238898))
            Line((18.5, 82.21238898), (16.5, 82.21238898))
            Line((16.5, 82.21238898), (16.5, 56.212388981))
            ThreePointArc((16.5, 56.212388981), (15.914213563, 54.798175418), (14.5, 54.212388981))
            Line((14.5, 54.212388981), (2, 54.212388981))
            ThreePointArc((2, 54.212388981), (-0.828427124, 53.040816105), (-2, 50.212388981))
            Line((-2, 50.212388981), (-2, 33.5))
        make_face()
    extrude(amount=SKETCHED_BEND7_DEPTH, mode=Mode.SUBTRACT)

    # Sketched Bend7 2 outline → Sketched Bend7 2 (add)
    with BuildSketch(Plane.XY.offset(SKETCHED_START_9)):
        with BuildLine():
            ThreePointArc((0, 33.5), (0.585786438, 34.914213562), (2, 35.5))
            Line((2, 35.5), (13.000000011, 35.5))
            Line((13.000000011, 35.5), (13.000000011, 37.5))
            Line((13.000000011, 37.5), (2, 37.5))
            ThreePointArc((2, 37.5), (0.96472382, 37.363703305), (0, 36.964101616))
            Line((0, 36.964101616), (0, 33.5))
        make_face()
        with Locations((17, 25.750000003)):
            Rectangle(SKETCHED_BEND7_2_OUTLINE_W, SKETCHED_BEND7_2_OUTLINE_H)
    extrude(amount=SKETCHED_BEND7_2_DEPTH)

    # Sketched Bend7 3 outline → Sketched Bend7 3 (add)
    with BuildSketch(Plane.XY.offset(SKETCHED_START_5)):
        with BuildLine():
            Line((18, 22), (16, 22))
            Line((16, 22), (16, 21))
            ThreePointArc((16, 21), (17.171572875, 18.171572875), (20, 17))
            Line((20, 17), (46, 17))
            Line((46, 17), (46, 19))
            Line((46, 19), (20, 19))
            ThreePointArc((20, 19), (18.585786438, 19.585786437), (18, 21))
            Line((18, 21), (18, 22))
        make_face()
    extrude(amount=SKETCHED_BEND7_3_DEPTH)

    # Sketched Bend7 4 outline → Sketched Bend7 4 (add)
    with BuildSketch(Plane.XY.offset(SKETCHED_START_9)):
        with BuildLine():
            Line((13.000000011, 37.5), (13.000000011, 35.5))
            Line((13.000000011, 35.5), (14, 35.5))
            ThreePointArc((14, 35.5), (15.414213563, 34.914213563), (16, 33.5))
            Line((16, 33.5), (16, 29.500000007))
            Line((16, 29.500000007), (18, 29.500000007))
            Line((18, 29.500000007), (18, 33.5))
            ThreePointArc((18, 33.5), (16.828427125, 36.328427125), (14, 37.5))
            Line((14, 37.5), (13.000000011, 37.5))
        make_face()
    extrude(amount=SKETCHED_BEND7_4_DEPTH)

    # Sketched Bend7 5 outline → Sketched Bend7 5 (add)
    with BuildSketch(Plane.XY.offset(SKETCHED_START_12)):
        with BuildLine():
            Line((13.000000011, 37.5), (13.000000011, 35.5))
            Line((13.000000011, 35.5), (14, 35.5))
            ThreePointArc((14, 35.5), (15.414213563, 34.914213563), (16, 33.5))
            Line((16, 33.5), (16, 29.500000007))
            Line((16, 29.500000007), (18, 29.500000007))
            Line((18, 29.500000007), (18, 33.5))
            ThreePointArc((18, 33.5), (16.828427125, 36.328427125), (14, 37.5))
            Line((14, 37.5), (13.000000011, 37.5))
        make_face()
    extrude(amount=SKETCHED_BEND7_5_DEPTH)

    # Sketched Bend7 6 outline → Sketched Bend7 6 (cut)
    with BuildSketch(Plane(origin=(0, 0, 0), x_dir=(1, 0, 0), z_dir=(0, 1, 0)).offset(SKETCHED_START_13)):
        with BuildLine():
            Line((18, -5.25), (18, -4))
            Line((18, -4), (13.000000011, -4))
            Line((13.000000011, -4), (13.000000011, -1.5))
            ThreePointArc((13.000000011, -1.5), (12.633883488, -2.383883477), (11.750000011, -2.75))
            Line((11.750000011, -2.75), (5.250000011, -2.75))
            ThreePointArc((5.250000011, -2.75), (4.000000011, -4), (5.250000011, -5.25))
            Line((5.250000011, -5.25), (18, -5.25))
        make_face()
        with BuildLine():
            Line((18, 4), (18, 5.25))
            Line((18, 5.25), (5.250000011, 5.25))
            ThreePointArc((5.250000011, 5.25), (4.000000011, 4), (5.250000011, 2.75))
            Line((5.250000011, 2.75), (11.750000011, 2.75))
            ThreePointArc((11.750000011, 2.75), (12.633883488, 2.383883477), (13.000000011, 1.5))
            Line((13.000000011, 1.5), (13.000000011, 4))
            Line((13.000000011, 4), (18, 4))
        make_face()
    extrude(amount=SKETCHED_BEND7_6_DEPTH, mode=Mode.SUBTRACT)

    # Sketched Bend7 7 outline → Sketched Bend7 7 (cut)
    with BuildSketch(Plane(origin=(0, 0, 0), x_dir=(1, 0, 0), z_dir=(0, 1, 0)).offset(SKETCHED_START_14)):
        with BuildLine():
            Line((46, -15), (46, -11))
            ThreePointArc((46, -11), (44.828427125, -13.828427125), (42, -15))
            Line((42, -15), (46, -15))
        make_face()
        with BuildLine():
            ThreePointArc((42, 15), (44.828427125, 13.828427125), (46, 11))
            Line((46, 11), (46, 15))
            Line((46, 15), (42, 15))
        make_face()
        with Locations((33, -10.5)):
            Circle(SKETCHED_BEND7_7_OUTLINE_R)
        with Locations((33, -2.5)):
            Circle(SKETCHED_BEND7_7_OUTLINE_R)
    extrude(amount=SKETCHED_BEND7_7_DEPTH, mode=Mode.SUBTRACT)

    # Sketched Bend7 8 outline → Sketched Bend7 8 (cut)
    with BuildSketch(Plane.YZ.offset(SKETCHED_START_15)):
        with BuildLine():
            Line((22, -45), (26, -45))
            ThreePointArc((26, -45), (23.171572875, -43.828427125), (22, -41))
            Line((22, -41), (22, -45))
        make_face()
        with BuildLine():
            Line((22, 45), (22, 41))
            ThreePointArc((22, 41), (23.171572875, 43.828427125), (26, 45))
            Line((26, 45), (22, 45))
        make_face()
        with BuildLine():
            Line((30.750000007, -4), (29.500000007, -4))
            ThreePointArc((29.500000007, -4), (29.866116531, -4.883883476), (30.750000007, -5.25))
            Line((30.750000007, -5.25), (30.750000007, -4))
        make_face()
        with BuildLine():
            Line((30.750000007, 4), (30.750000007, 5.25))
            ThreePointArc((30.750000007, 5.25), (29.866116531, 4.883883476), (29.500000007, 4))
            Line((29.500000007, 4), (30.750000007, 4))
        make_face()
        with Locations((25, 27.5)):
            Circle(SKETCHED_BEND7_8_OUTLINE_R)
        with Locations((25, -27.5)):
            Circle(SKETCHED_BEND7_8_OUTLINE_R)
    extrude(amount=SKETCHED_BEND7_8_DEPTH, mode=Mode.SUBTRACT)

    # Sketched Bend8: read off the stored shape, not the designer's step
    # Sketched Bend8 outline → Sketched Bend8 (cut)
    with BuildSketch(Plane(origin=(0, 0, 0), x_dir=(1, 0, 0), z_dir=(0, 1, 0)).offset(SKETCHED_START_16)):
        with Locations((-1, 54.999999998)):
            Rectangle(SKETCHED_BEND8_OUTLINE_W, SKETCHED_BEND8_OUTLINE_H)
    extrude(amount=SKETCHED_BEND8_DEPTH, mode=Mode.SUBTRACT)

    # Sketched Bend8 2 outline → Sketched Bend8 2 (add)
    with BuildSketch(Plane(origin=(0, 0, 0), x_dir=(1, 0, 0), z_dir=(0, 1, 0)).offset(SKETCHED_START_17)):
        with BuildLine():
            Line((-15.869100306, 46.999999998), (-2, 46.999999997))
            Line((-2, 46.999999997), (-2, 62.999999998))
            Line((-2, 62.999999998), (-15.869100306, 62.999999998))
            ThreePointArc((-15.869100306, 62.999999998), (-17.283313869, 62.414213561), (-17.869100306, 60.999999998))
            Line((-17.869100306, 60.999999998), (-17.869100306, 48.999999998))
            ThreePointArc((-17.869100306, 48.999999998), (-17.283313869, 47.585786435), (-15.869100306, 46.999999998))
        make_face()
        with Locations((-13.869100306, 54.999999998)):
            Circle(SKETCHED_BEND8_2_OUTLINE_R, mode=Mode.SUBTRACT)
        with Locations((-5.869100306, 54.999999998)):
            Circle(SKETCHED_BEND8_2_OUTLINE_R, mode=Mode.SUBTRACT)
    extrude(amount=SKETCHED_BEND8_2_DEPTH)

    # Sketched Bend8 3 outline → Sketched Bend8 3 (add)
    with BuildSketch(Plane(origin=(0, 0, 0), x_dir=(1, 0, 0), z_dir=(0, 1, 0)).offset(SKETCHED_START_18)):
        with BuildLine():
            Line((-15.869100306, 46.999999998), (-2, 46.999999997))
            Line((-2, 46.999999997), (-2, 62.999999998))
            Line((-2, 62.999999998), (-15.869100306, 62.999999998))
            ThreePointArc((-15.869100306, 62.999999998), (-17.283313869, 62.414213561), (-17.869100306, 60.999999998))
            Line((-17.869100306, 60.999999998), (-17.869100306, 48.999999998))
            ThreePointArc((-17.869100306, 48.999999998), (-17.283313869, 47.585786435), (-15.869100306, 46.999999998))
        make_face()
        with Locations((-13.869100306, 54.999999998)):
            Circle(SKETCHED_BEND8_3_OUTLINE_R, mode=Mode.SUBTRACT)
        with Locations((-5.869100306, 54.999999998)):
            Circle(SKETCHED_BEND8_3_OUTLINE_R, mode=Mode.SUBTRACT)
    extrude(amount=SKETCHED_BEND8_3_DEPTH)

    # Sketched Bend8 4 outline → Sketched Bend8 4 (cut)
    with BuildSketch(Plane.XY.offset(SKETCHED_START_19)):
        with BuildLine():
            ThreePointArc((-1.939847539, 9.797769412), (-0.51857717, 8.338794465), (0, 6.369100306))
            Line((0, 6.369100306), (0, 9.797769412))
            Line((0, 9.797769412), (-1.939847539, 9.797769412))
        make_face()
        with BuildLine():
            ThreePointArc((-4, 10.369100306), (-2.96472382, 10.232803611), (-2, 9.833201922))
            Line((-2, 9.833201922), (-2, 10.369100306))
            Line((-2, 10.369100306), (-4, 10.369100306))
        make_face()
        with BuildLine():
            Line((-17.869100306, 6.746620306), (-2.035953501, 6.746620306))
            ThreePointArc((-2.035953501, 6.746620306), (-2.726233931, 7.911021186), (-4, 8.369100306))
            Line((-4, 8.369100306), (-17.869100306, 8.369100306))
            Line((-17.869100306, 8.369100306), (-17.869100306, 6.746620306))
        make_face()
    extrude(amount=SKETCHED_BEND8_4_DEPTH, mode=Mode.SUBTRACT)

    # Sketched Bend8 5 outline → Sketched Bend8 5 (add)
    with BuildSketch(Plane.XY.offset(SKETCHED_START_19)):
        with BuildLine():
            Line((-2, 9.797769412), (-1.939847539, 9.797769412))
            ThreePointArc((-1.939847539, 9.797769412), (-1.969846467, 9.8156169), (-2, 9.833201922))
            Line((-2, 9.833201922), (-2, 9.797769412))
        make_face()
        with BuildLine():
            Line((-2, 6.369100306), (-2, 6.746620306))
            Line((-2, 6.746620306), (-2.035953501, 6.746620306))
            ThreePointArc((-2.035953501, 6.746620306), (-2.009008664, 6.558714391), (-2, 6.369100306))
        make_face()
    extrude(amount=SKETCHED_BEND8_5_DEPTH)


solid = part.part
